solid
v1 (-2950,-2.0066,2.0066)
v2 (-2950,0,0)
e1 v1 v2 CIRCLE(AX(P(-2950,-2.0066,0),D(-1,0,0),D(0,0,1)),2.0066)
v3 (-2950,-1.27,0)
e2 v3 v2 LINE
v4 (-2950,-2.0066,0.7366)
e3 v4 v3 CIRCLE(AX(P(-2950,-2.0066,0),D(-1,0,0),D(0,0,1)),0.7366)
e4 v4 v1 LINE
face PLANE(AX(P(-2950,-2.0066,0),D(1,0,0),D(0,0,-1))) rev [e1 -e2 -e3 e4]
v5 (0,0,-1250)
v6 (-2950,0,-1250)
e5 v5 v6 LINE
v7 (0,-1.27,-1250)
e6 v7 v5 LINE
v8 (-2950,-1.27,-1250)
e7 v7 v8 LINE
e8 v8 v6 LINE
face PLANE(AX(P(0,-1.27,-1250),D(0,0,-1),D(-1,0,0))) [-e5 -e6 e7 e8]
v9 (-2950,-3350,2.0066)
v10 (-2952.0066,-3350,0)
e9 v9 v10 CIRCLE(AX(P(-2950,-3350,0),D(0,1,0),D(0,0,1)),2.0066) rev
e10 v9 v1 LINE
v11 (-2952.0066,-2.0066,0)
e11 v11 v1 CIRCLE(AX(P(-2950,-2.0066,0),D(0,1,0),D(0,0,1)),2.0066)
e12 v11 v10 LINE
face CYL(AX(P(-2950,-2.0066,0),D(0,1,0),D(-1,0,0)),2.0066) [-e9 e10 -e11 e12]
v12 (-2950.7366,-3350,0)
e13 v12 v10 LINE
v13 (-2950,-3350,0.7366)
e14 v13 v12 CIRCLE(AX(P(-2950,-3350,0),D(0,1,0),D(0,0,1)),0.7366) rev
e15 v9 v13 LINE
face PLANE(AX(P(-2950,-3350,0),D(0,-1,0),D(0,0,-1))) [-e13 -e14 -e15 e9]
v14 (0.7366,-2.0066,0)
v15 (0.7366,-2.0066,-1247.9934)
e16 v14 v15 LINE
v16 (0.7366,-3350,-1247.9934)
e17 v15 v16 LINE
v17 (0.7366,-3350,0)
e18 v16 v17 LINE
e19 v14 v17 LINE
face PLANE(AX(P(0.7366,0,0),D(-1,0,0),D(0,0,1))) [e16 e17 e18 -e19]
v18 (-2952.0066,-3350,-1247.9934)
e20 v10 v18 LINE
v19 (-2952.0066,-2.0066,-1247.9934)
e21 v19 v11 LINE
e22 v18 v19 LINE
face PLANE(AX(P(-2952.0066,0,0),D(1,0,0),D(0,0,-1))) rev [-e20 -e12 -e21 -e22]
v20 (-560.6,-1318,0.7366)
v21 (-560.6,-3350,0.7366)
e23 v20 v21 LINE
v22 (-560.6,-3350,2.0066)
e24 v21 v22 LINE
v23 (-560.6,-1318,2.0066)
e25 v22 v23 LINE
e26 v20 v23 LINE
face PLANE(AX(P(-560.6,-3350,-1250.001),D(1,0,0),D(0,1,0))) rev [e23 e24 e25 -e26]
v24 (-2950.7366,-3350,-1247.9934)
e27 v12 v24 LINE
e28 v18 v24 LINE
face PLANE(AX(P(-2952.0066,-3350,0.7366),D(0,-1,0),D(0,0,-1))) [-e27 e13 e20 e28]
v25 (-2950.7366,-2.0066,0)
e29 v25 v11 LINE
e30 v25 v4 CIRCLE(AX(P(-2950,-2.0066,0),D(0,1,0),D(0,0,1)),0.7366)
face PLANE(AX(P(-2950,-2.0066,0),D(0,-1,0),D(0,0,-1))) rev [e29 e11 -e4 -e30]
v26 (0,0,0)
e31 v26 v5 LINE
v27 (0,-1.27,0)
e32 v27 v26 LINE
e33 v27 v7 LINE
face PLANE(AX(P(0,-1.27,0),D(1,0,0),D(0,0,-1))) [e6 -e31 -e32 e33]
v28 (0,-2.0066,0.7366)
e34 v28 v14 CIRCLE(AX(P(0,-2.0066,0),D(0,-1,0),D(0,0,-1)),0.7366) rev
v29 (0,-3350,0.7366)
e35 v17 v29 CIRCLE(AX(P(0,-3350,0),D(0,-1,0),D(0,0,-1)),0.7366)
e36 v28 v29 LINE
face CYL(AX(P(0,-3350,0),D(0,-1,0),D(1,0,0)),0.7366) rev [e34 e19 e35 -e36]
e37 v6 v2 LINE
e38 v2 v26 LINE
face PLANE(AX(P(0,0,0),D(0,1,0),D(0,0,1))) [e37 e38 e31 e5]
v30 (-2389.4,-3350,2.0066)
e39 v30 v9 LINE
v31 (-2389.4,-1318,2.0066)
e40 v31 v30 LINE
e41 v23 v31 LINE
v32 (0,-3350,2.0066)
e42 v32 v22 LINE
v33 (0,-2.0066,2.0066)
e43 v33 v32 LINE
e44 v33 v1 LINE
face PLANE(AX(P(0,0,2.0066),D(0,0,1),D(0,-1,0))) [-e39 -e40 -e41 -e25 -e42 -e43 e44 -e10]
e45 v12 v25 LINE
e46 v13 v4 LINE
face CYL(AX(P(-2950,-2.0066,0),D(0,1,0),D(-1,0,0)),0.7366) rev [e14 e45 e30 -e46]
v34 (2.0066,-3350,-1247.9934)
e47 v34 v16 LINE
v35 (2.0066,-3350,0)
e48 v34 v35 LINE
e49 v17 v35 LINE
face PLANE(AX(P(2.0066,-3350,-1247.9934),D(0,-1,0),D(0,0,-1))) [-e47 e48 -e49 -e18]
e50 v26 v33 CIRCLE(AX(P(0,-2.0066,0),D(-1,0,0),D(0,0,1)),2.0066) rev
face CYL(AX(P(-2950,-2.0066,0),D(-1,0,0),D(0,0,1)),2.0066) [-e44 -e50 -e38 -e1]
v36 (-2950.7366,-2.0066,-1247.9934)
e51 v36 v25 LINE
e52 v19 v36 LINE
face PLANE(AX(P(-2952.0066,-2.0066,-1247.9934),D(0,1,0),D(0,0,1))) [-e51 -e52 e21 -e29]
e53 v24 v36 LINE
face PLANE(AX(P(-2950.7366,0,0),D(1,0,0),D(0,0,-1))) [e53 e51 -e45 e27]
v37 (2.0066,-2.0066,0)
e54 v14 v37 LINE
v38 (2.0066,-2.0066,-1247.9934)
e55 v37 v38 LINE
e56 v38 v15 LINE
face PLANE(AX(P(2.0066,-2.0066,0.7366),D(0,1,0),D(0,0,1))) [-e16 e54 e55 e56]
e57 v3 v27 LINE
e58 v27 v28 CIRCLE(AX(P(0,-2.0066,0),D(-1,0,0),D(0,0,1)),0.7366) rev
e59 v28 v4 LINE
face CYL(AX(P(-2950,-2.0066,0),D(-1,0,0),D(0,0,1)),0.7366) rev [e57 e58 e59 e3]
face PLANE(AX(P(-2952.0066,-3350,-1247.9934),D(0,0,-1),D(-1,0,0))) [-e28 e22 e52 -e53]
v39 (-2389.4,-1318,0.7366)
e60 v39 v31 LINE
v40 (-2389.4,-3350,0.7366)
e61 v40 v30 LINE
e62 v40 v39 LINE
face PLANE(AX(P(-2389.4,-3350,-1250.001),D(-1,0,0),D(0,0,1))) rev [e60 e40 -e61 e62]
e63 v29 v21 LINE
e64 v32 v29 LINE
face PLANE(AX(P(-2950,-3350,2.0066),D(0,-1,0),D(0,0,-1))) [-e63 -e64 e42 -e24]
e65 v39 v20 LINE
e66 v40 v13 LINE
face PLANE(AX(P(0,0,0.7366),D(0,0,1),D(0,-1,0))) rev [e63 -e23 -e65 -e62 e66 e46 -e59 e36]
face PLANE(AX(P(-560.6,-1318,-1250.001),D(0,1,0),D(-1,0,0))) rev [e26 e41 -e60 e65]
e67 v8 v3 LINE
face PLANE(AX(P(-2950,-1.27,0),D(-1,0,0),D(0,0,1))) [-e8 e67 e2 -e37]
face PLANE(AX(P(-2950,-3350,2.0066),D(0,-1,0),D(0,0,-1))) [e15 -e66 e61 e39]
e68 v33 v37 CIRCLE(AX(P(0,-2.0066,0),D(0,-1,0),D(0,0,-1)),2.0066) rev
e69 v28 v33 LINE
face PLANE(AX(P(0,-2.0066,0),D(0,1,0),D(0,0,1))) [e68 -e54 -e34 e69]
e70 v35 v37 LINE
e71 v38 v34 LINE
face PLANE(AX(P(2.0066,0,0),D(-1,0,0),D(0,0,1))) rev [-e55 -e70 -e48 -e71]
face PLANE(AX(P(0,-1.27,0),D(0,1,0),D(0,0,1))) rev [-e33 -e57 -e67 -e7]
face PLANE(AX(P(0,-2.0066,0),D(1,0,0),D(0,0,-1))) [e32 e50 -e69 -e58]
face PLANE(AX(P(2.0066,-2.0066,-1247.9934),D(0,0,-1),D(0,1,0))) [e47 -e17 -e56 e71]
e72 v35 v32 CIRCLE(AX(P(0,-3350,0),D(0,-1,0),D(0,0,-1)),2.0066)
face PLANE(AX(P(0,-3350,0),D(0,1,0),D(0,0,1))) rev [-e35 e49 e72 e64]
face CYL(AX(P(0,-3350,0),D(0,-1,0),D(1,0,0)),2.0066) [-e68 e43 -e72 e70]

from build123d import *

# Parameters (mm, degrees)
SKETCH1_W          = 2950
SKETCH1_H          = 1250
BASE_FLANGE1_DEPTH = 1.27
EDGE_FLANGE1_DEPTH = 2950
EDGE_FLANGE2_DEPTH = 3347.9934
EDGE_FLANGE3_DEPTH = 3347.9934
CUT_EXTRUDE1_REACH = 4639.28
SKETCH16_W         = 1828.8
SKETCH16_H         = 2032


# Sheet-metal steps are written as plain solids
with BuildPart() as part:
    # Sketch1 → Base-Flange1 (new body)
    with BuildSketch(Plane(origin=(0, 0, 0), x_dir=(1, 0, 0), z_dir=(0, 1, 0))):
        with Locations((-1475, 625)):
            Rectangle(SKETCH1_W, SKETCH1_H)
    extrude(amount=-BASE_FLANGE1_DEPTH)

    # Edge-Flange1 section (across the edge) → Edge-Flange1 (add)
    with BuildSketch(Plane(origin=(0, -1.27, 0.7366), x_dir=(0, 0, -1), z_dir=(-1, 0, 0))):
        with BuildLine():
            Line((-1.27, 0.7366), (-1.27, 3348.73))
            Line((-1.27, 3348.73), (0, 3348.73))
            Line((0, 3348.73), (0, 0.7366))
            ThreePointArc((0, 0.7366), (0.215745145, 0.215745145), (0.7366, 0))
            Line((0.7366, 0), (0.7366, -1.27))
            ThreePointArc((0.7366, -1.27), (-0.682280467, -0.682280467), (-1.27, 0.7366))
        make_face()
    extrude(amount=EDGE_FLANGE1_DEPTH)

    # Edge-Flange2 section (across the edge) → Edge-Flange2 (add)
    with BuildSketch(Plane(origin=(0.7366, -2.0066, 0.7366), x_dir=(-1, 0, 0), z_dir=(0, -1, 0))):
        with BuildLine():
            Line((-1.27, 0.7366), (-1.27, 1248.73))
            Line((-1.27, 1248.73), (0, 1248.73))
            Line((0, 1248.73), (0, 0.7366))
            ThreePointArc((0, 0.7366), (0.215745145, 0.215745145), (0.7366, 0))
            Line((0.7366, 0), (0.7366, -1.27))
            ThreePointArc((0.7366, -1.27), (-0.682280467, -0.682280467), (-1.27, 0.7366))
        make_face()
    extrude(amount=EDGE_FLANGE2_DEPTH)

    # Edge-Flange3 section (across the edge) → Edge-Flange3 (add)
    with BuildSketch(Plane(origin=(-2950.7366, -3350, 0.7366), x_dir=(1, 0, 0), z_dir=(0, 1, 0))):
        with BuildLine():
            Line((-1.27, 0.7366), (-1.27, 1248.73))
            Line((-1.27, 1248.73), (0, 1248.73))
            Line((0, 1248.73), (0, 0.7366))
            ThreePointArc((0, 0.7366), (0.215745145, 0.215745145), (0.7366, 0))
            Line((0.7366, 0), (0.7366, -1.27))
            ThreePointArc((0.7366, -1.27), (-0.682280467, -0.682280467), (-1.27, 0.7366))
        make_face()
    extrude(amount=EDGE_FLANGE3_DEPTH)

    # Sketch16 → Cut-Extrude1 (cut, up to next)
    with BuildSketch(Plane.XY.offset(2.0066), mode=Mode.PRIVATE) as cut_extrude1_sk1:
        with Locations((-1475, -2334)):
            Rectangle(SKETCH16_W, SKETCH16_H)
    cut_extrude1_tool1 = extrude(cut_extrude1_sk1.sketch, amount=-CUT_EXTRUDE1_REACH, mode=Mode.PRIVATE) & part.part
    add(cut_extrude1_tool1.solids().sort_by_distance((-1475, -2334, 2.0066))[0], mode=Mode.SUBTRACT)


solid = part.part
